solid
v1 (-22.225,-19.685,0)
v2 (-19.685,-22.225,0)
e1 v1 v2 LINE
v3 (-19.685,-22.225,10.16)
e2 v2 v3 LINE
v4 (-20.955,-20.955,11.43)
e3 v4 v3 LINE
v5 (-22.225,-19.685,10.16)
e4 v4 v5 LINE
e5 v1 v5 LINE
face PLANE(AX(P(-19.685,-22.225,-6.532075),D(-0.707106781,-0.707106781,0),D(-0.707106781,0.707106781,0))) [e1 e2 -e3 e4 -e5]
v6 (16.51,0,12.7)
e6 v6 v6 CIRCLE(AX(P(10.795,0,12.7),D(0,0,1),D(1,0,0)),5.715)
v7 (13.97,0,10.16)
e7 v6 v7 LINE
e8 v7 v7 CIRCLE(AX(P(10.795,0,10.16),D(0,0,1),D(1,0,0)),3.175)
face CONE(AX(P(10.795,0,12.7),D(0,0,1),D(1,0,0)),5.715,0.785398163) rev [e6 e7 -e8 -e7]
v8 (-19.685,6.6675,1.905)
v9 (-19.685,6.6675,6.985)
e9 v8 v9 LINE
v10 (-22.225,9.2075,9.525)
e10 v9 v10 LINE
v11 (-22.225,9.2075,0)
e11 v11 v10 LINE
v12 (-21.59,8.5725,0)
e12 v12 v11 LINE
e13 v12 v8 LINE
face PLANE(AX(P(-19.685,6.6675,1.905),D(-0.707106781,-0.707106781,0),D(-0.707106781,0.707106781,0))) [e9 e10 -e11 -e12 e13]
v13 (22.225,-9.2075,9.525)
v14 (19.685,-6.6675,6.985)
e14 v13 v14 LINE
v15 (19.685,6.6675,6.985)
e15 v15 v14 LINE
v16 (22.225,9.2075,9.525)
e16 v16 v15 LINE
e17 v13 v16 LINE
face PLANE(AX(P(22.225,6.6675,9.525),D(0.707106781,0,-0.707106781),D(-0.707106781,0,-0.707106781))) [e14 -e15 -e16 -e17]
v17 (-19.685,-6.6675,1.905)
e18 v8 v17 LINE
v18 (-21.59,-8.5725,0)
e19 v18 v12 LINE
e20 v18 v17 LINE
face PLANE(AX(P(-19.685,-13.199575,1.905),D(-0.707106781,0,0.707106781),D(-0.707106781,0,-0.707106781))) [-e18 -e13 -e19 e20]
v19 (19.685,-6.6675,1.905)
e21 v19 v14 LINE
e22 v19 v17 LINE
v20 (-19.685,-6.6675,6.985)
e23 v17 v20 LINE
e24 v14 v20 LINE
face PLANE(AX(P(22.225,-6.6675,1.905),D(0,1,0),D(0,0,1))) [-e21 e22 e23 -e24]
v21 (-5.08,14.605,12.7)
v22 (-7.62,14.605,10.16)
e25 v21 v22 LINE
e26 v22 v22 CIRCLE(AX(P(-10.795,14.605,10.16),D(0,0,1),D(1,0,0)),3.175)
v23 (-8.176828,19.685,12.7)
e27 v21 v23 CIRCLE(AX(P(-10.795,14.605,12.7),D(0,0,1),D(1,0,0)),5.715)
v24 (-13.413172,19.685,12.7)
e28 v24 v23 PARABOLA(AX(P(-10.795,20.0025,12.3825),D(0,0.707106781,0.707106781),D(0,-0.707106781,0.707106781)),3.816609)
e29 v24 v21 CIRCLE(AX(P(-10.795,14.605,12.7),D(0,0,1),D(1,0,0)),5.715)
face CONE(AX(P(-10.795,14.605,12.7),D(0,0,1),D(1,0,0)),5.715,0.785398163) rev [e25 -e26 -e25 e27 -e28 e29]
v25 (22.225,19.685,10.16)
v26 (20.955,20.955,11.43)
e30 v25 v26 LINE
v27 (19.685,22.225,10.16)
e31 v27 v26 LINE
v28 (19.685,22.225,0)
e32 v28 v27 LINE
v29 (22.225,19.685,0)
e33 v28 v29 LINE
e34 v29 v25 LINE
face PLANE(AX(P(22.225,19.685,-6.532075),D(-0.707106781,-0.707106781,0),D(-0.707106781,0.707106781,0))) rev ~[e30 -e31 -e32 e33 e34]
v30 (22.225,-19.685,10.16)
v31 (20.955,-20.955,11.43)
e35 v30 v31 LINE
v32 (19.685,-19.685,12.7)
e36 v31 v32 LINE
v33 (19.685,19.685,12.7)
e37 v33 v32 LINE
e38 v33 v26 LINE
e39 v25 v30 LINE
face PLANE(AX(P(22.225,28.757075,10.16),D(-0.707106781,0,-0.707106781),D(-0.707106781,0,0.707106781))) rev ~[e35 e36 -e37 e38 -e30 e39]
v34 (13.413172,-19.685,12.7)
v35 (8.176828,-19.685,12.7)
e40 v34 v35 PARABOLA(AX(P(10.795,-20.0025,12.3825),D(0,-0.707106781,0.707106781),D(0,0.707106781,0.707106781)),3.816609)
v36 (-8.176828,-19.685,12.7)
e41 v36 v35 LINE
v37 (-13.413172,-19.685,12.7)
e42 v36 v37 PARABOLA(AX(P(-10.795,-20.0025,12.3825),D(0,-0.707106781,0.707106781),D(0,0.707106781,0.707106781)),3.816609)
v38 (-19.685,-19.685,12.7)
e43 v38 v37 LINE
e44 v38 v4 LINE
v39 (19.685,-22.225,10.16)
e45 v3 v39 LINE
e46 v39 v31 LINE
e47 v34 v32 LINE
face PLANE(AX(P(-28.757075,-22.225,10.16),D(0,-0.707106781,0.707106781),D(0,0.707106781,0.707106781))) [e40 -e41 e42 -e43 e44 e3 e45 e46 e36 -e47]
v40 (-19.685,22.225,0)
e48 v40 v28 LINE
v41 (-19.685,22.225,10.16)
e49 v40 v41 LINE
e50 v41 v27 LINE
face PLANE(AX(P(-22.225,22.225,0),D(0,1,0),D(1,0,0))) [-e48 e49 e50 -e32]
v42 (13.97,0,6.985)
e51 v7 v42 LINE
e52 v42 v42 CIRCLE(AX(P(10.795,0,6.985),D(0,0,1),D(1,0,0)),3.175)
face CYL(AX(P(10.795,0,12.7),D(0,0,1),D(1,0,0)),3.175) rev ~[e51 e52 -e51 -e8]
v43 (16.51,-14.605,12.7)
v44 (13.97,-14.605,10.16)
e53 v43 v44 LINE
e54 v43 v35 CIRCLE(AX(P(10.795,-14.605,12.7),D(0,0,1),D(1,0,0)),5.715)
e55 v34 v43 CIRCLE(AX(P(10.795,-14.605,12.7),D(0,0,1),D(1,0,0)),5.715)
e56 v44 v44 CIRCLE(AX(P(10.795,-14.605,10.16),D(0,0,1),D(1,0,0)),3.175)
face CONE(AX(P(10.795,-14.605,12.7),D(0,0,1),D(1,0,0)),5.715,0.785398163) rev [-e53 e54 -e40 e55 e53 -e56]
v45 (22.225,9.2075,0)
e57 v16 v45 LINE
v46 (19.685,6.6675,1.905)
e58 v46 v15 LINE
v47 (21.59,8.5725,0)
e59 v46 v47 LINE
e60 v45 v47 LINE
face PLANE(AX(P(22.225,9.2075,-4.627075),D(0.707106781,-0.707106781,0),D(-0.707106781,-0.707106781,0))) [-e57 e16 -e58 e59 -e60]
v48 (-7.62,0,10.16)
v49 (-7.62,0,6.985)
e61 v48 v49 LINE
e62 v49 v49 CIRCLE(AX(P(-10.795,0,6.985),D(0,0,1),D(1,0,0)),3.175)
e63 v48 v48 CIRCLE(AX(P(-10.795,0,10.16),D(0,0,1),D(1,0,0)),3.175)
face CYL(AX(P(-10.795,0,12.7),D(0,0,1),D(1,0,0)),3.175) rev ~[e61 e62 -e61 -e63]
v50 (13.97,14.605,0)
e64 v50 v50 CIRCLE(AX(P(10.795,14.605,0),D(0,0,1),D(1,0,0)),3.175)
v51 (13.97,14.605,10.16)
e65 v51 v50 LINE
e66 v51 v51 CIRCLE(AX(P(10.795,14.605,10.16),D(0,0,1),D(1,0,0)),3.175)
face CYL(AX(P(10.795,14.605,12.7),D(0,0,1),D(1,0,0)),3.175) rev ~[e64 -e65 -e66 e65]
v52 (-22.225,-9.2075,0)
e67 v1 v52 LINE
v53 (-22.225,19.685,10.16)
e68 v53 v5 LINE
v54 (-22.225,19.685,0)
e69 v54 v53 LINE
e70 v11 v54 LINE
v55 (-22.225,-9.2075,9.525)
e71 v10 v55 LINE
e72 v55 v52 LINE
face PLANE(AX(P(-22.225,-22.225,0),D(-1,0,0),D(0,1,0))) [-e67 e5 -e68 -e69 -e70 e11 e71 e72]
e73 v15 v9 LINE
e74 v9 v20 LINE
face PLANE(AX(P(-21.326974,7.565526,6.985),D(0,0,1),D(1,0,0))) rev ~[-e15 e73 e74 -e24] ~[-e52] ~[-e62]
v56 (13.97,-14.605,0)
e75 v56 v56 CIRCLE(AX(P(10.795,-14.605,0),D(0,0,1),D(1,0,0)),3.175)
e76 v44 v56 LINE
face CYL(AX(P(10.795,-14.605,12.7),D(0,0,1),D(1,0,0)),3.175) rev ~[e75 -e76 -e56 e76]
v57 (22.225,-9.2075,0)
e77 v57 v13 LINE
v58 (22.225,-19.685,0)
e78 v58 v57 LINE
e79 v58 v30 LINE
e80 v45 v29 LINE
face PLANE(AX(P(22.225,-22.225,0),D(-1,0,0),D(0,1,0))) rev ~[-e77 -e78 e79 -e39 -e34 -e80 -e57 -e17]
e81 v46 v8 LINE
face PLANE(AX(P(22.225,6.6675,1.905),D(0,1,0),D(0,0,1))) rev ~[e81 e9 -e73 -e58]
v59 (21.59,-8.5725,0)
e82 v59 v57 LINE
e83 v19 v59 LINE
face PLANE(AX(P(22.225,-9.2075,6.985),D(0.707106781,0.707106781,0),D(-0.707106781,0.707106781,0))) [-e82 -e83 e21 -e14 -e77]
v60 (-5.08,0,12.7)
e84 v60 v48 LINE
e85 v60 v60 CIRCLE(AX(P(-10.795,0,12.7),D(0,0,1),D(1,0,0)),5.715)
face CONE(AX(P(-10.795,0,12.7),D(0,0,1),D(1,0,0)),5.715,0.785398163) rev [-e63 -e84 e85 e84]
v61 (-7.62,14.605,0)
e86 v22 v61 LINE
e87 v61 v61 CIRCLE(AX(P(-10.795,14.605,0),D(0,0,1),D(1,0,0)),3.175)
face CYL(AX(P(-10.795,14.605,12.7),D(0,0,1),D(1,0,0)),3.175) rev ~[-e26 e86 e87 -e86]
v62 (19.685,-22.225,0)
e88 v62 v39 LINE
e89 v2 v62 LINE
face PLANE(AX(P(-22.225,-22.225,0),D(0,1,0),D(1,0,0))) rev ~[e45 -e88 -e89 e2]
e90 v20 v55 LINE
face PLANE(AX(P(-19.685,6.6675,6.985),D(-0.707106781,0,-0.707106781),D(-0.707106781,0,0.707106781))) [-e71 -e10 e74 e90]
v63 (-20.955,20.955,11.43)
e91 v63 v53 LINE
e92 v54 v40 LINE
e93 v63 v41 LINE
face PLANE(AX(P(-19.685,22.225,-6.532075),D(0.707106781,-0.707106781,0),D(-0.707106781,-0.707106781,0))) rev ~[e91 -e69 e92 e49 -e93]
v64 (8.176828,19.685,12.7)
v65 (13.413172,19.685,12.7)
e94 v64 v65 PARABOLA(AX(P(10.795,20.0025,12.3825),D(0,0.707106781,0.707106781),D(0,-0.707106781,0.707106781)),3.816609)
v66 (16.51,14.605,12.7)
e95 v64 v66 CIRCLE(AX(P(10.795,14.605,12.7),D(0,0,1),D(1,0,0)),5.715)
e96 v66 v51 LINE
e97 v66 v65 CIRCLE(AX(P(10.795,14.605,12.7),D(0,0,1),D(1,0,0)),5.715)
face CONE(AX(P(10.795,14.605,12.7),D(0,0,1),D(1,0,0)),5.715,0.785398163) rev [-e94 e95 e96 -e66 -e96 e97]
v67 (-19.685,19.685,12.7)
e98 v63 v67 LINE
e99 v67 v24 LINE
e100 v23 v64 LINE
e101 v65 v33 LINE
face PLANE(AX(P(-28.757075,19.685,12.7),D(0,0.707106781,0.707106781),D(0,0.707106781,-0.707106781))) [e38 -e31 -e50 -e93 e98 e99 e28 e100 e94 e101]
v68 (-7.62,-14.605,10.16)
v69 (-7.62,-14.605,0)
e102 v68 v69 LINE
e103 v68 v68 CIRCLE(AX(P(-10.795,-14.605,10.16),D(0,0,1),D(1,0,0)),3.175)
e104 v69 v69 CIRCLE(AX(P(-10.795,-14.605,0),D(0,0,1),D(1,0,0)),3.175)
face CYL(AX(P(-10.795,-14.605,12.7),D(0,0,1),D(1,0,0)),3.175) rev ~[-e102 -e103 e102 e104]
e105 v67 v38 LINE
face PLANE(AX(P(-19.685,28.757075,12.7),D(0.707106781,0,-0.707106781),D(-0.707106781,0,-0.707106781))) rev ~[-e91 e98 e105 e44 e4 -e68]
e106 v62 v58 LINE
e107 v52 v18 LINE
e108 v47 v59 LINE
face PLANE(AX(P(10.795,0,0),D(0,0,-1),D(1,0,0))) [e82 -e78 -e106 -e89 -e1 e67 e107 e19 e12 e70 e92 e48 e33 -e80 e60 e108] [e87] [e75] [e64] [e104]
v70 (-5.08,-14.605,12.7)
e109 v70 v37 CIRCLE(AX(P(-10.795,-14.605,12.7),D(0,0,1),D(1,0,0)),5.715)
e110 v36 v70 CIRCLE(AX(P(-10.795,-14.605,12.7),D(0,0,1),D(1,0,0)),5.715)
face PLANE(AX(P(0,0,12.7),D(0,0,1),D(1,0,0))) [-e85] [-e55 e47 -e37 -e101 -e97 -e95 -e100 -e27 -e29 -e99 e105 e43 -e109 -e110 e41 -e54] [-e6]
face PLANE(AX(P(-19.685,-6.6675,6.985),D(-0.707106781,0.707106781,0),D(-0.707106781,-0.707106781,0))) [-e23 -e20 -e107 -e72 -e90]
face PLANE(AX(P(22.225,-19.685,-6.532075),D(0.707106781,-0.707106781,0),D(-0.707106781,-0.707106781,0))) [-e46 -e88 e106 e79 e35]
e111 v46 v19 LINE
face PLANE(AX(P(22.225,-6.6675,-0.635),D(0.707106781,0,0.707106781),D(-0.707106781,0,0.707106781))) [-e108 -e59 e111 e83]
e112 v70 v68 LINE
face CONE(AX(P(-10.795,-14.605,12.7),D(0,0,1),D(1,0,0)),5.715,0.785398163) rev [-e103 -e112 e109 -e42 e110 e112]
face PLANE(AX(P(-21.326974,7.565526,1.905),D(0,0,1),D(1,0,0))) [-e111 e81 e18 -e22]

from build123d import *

# Parameters (mm, degrees)
F0_W          = 44.45
F0_H          = 44.45
F1_DEPTH      = 12.7
F2_W          = 13.335
F2_H          = 5.08
F3_DEPTH      = 76.2
F4_R          = 3.175
F5_DEPTH      = 25.4
F6_T1_DEPTH   = 57.5141495789
F6_T3_DEPTH   = 57.5141495789
F7_T1_DEPTH   = 5.08
F7_T3_DEPTH   = 13.335
F7_T5_DEPTH   = 23.2241495789
F7_T11_DEPTH  = 19.8670747894
F7_T16_DEPTH  = 11.6120747894
F7_T24_DEPTH  = 19.8670747894
F7_T28_DEPTH  = 11.6120747894
F7_T36_DEPTH  = 11.6120747894
F7_T41_DEPTH  = 19.8670747894
F7_T49_DEPTH  = 11.6120747894
F7_T54_DEPTH  = 19.8670747894
F7_T61_DEPTH  = 19.8670747894
F7_T65_DEPTH  = 11.6120747894
F7_T73_DEPTH  = 11.6120747894
F7_T78_DEPTH  = 19.8670747894
F7_T85_DEPTH  = 19.8670747894
F7_T90_DEPTH  = 11.6120747894
F7_T98_DEPTH  = 11.6120747894
F7_T103_DEPTH = 19.8670747894
F8_R          = 3.175
F9_DEPTH      = 1.905


# Not quite as in the source:
# - a fillet or chamfer that OpenCascade refuses, or shapes differently, is made with other operations: its cross-section is extruded or revolved along the edge and cut away or added


with BuildPart() as f1:
    # F0 (on Top) → F1 (new body)
    with BuildSketch(Plane.XY):
        Rectangle(F0_W, F0_H)
    extrude(amount=F1_DEPTH)

    # F2 (on face) → F3 (cut)
    with BuildSketch(Plane.YZ.offset(22.225)):
        with Locations((0, 4.445)):
            Rectangle(F2_W, F2_H)
    extrude(amount=-F3_DEPTH, mode=Mode.SUBTRACT)

    # F4 (on face) → F5 (cut)
    with BuildSketch(Plane.XY.offset(12.7)):
        with Locations((10.795, 14.605)):
            Circle(F4_R)
        with Locations((-10.795, 14.605)):
            Circle(F4_R)
        with Locations((-10.795, -14.605)):
            Circle(F4_R)
        with Locations((10.795, -14.605)):
            Circle(F4_R)
        with Locations((-10.795, 0)):
            Circle(F4_R)
        with Locations((10.795, 0)):
            Circle(F4_R)
    extrude(amount=-F5_DEPTH, mode=Mode.SUBTRACT)

    # F6: chamfer of 2.54 on 10 edges, made by hand

    # F6_s2 → F6_t1 (cut)
    with BuildSketch(Plane.XZ.offset(-28.7570747894)):
        Polygon((22.225, 10.16), (19.685, 12.7), (22.225, 12.7), align=None)
        Polygon((-19.685, 12.7), (-22.225, 10.16), (-22.225, 12.7), align=None)
    extrude(amount=F6_T1_DEPTH, mode=Mode.SUBTRACT)

    # F6_s4 → F6_t3 (cut)
    with BuildSketch(Plane.YZ.offset(-28.7570747894)):
        Polygon((-22.225, 10.16), (-19.685, 12.7), (-22.225, 12.7), align=None)
        Polygon((19.685, 12.7), (22.225, 10.16), (22.225, 12.7), align=None)
    extrude(amount=F6_T3_DEPTH, mode=Mode.SUBTRACT)

    # F6_s5 → F6_t6 (revolve, cut)
    with BuildSketch(Plane.XZ.offset(14.605)):
        Polygon((-5.08, 12.7), (-7.62, 10.16), (-7.62, 12.7), align=None)
    revolve(axis=Axis((-10.795, -14.605, 12.7), (0, 0, 1)), mode=Mode.SUBTRACT)

    # F6_s7 → F6_t8 (revolve, cut)
    with BuildSketch(Plane.XZ):
        Polygon((-5.08, 12.7), (-7.62, 10.16), (-7.62, 12.7), align=None)
    revolve(axis=Axis((-10.795, 0, 12.7), (0, 0, 1)), mode=Mode.SUBTRACT)

    # F6_s9 → F6_t10 (revolve, cut)
    with BuildSketch(Plane.XZ.offset(14.605)):
        Polygon((16.51, 12.7), (13.97, 10.16), (13.97, 12.7), align=None)
    revolve(axis=Axis((10.795, -14.605, 12.7), (0, 0, 1)), mode=Mode.SUBTRACT)

    # F6_s11 → F6_t12 (revolve, cut)
    with BuildSketch(Plane.XZ):
        Polygon((16.51, 12.7), (13.97, 10.16), (13.97, 12.7), align=None)
    revolve(axis=Axis((10.795, 0, 12.7), (0, 0, 1)), mode=Mode.SUBTRACT)

    # F6_s13 → F6_t14 (revolve, cut)
    with BuildSketch(Plane.XZ.offset(-14.605)):
        Polygon((-5.08, 12.7), (-7.62, 10.16), (-7.62, 12.7), align=None)
    revolve(axis=Axis((-10.795, 14.605, 12.7), (0, 0, 1)), mode=Mode.SUBTRACT)

    # F6_s15 → F6_t16 (revolve, cut)
    with BuildSketch(Plane.XZ.offset(-14.605)):
        Polygon((16.51, 12.7), (13.97, 10.16), (13.97, 12.7), align=None)
    revolve(axis=Axis((10.795, 14.605, 12.7), (0, 0, 1)), mode=Mode.SUBTRACT)

    # F7: chamfer of 2.54 on 12 edges, made by hand

    # F7_s2 → F7_t1 (cut)
    with BuildSketch(Plane.XY.offset(1.905)):
        Polygon((22.225, 9.2075), (19.685, 6.6675), (22.225, 6.6675), align=None)
        Polygon((22.225, -9.2075), (19.685, -6.6675), (22.225, -6.6675), align=None)
        Polygon((-19.685, 6.6675), (-22.225, 9.2075), (-22.225, 6.6675), align=None)
        Polygon((-19.685, -6.6675), (-22.225, -9.2075), (-22.225, -6.6675), align=None)
    extrude(amount=F7_T1_DEPTH, mode=Mode.SUBTRACT)

    # F7_s4 → F7_t3 (cut)
    with BuildSketch(Plane.XZ.offset(-6.6675)):
        Polygon((22.225, -0.635), (19.685, 1.905), (22.225, 1.905), align=None)
        Polygon((22.225, 9.525), (19.685, 6.985), (22.225, 6.985), align=None)
        Polygon((-19.685, 6.985), (-22.225, 9.525), (-22.225, 6.985), align=None)
        Polygon((-19.685, 1.905), (-22.225, -0.635), (-22.225, 1.905), align=None)
    extrude(amount=F7_T3_DEPTH, mode=Mode.SUBTRACT)

    # F7_s6 → F7_t5 (cut)
    with BuildSketch(Plane.XY.offset(-6.5320747894)):
        Polygon((-19.685, -22.225), (-22.225, -19.685), (-22.225, -22.225), align=None)
        Polygon((22.225, -19.685), (19.685, -22.225), (22.225, -22.225), align=None)
        Polygon((22.225, 19.685), (19.685, 22.225), (22.225, 22.225), align=None)
        Polygon((-19.685, 22.225), (-22.225, 19.685), (-22.225, 22.225), align=None)
    extrude(amount=F7_T5_DEPTH, mode=Mode.SUBTRACT)


with BuildPart() as f7_tool9:
    # F7_s10 → F7_t11 (new body)
    with BuildSketch(Plane.XZ.offset(6.6675)):
        Polygon((22.225, -0.635), (19.685, 1.905), (22.225, 1.905), align=None)
    extrude(amount=-F7_T11_DEPTH)

    split(bisect_by=Plane.XY, keep=Keep.TOP)

    split(bisect_by=Plane.XZ.offset(-6.6675), keep=Keep.BOTTOM)


with BuildPart() as f7_tool14:
    # F7_s15 → F7_t16 (new body)
    with BuildSketch(Plane.XY.offset(-4.6270747894)):
        Polygon((22.225, 9.2075), (19.685, 6.6675), (22.225, 6.6675), align=None)
    extrude(amount=F7_T16_DEPTH)

    split(bisect_by=Plane.XY, keep=Keep.TOP)

    split(bisect_by=Plane.XY.offset(1.905), keep=Keep.BOTTOM)


with BuildPart() as f7_tool9_1:
    add(f7_tool9.part)

    # F7_t19: intersect F7_tool14
    add(f7_tool14.part, mode=Mode.INTERSECT)


with BuildPart() as f1_1:
    add(f1.part)

    # F7_t7: cut F7_tool9
    add(f7_tool9_1.part, mode=Mode.SUBTRACT)


with BuildPart() as f7_tool22:
    # F7_s23 → F7_t24 (new body)
    with BuildSketch(Plane.XZ.offset(-13.1995747894)):
        Polygon((22.225, 9.525), (19.685, 6.985), (22.225, 6.985), align=None)
    extrude(amount=F7_T24_DEPTH)

    split(bisect_by=Plane.XZ.offset(-6.6675), keep=Keep.BOTTOM)


with BuildPart() as f7_tool26:
    # F7_s27 → F7_t28 (new body)
    with BuildSketch(Plane.XY.offset(1.905)):
        Polygon((22.225, 9.2075), (19.685, 6.6675), (22.225, 6.6675), align=None)
    extrude(amount=F7_T28_DEPTH)

    split(bisect_by=Plane(origin=(16.1925, 0, 16.1925), x_dir=(0, 1, 0), z_dir=(-0.7071067812, 0, -0.7071067812)), keep=Keep.TOP)

    split(bisect_by=Plane.XY.offset(6.985), keep=Keep.TOP)


with BuildPart() as f7_tool22_1:
    add(f7_tool22.part)

    # F7_t31: intersect F7_tool26
    add(f7_tool26.part, mode=Mode.INTERSECT)


with BuildPart() as f1_2:
    add(f1_1.part)

    # F7_t20: cut F7_tool22
    add(f7_tool22_1.part, mode=Mode.SUBTRACT)


with BuildPart() as f7_tool34:
    # F7_s35 → F7_t36 (new body)
    with BuildSketch(Plane.XY.offset(6.985)):
        Polygon((22.225, -9.2075), (19.685, -6.6675), (22.225, -6.6675), align=None)
    extrude(amount=-F7_T36_DEPTH)

    split(bisect_by=Plane.XY, keep=Keep.TOP)

    split(bisect_by=Plane.XY.offset(1.905), keep=Keep.BOTTOM)


with BuildPart() as f7_tool39:
    # F7_s40 → F7_t41 (new body)
    with BuildSketch(Plane.XZ.offset(13.1995747894)):
        Polygon((22.225, -0.635), (19.685, 1.905), (22.225, 1.905), align=None)
    extrude(amount=-F7_T41_DEPTH)

    split(bisect_by=Plane.XY, keep=Keep.TOP)

    split(bisect_by=Plane.XZ.offset(6.6675), keep=Keep.TOP)


with BuildPart() as f7_tool34_1:
    add(f7_tool34.part)

    # F7_t44: intersect F7_tool39
    add(f7_tool39.part, mode=Mode.INTERSECT)


with BuildPart() as f1_3:
    add(f1_2.part)

    # F7_t32: cut F7_tool34
    add(f7_tool34_1.part, mode=Mode.SUBTRACT)


with BuildPart() as f7_tool47:
    # F7_s48 → F7_t49 (new body)
    with BuildSketch(Plane.XY.offset(13.5170747894)):
        Polygon((22.225, -9.2075), (19.685, -6.6675), (22.225, -6.6675), align=None)
    extrude(amount=-F7_T49_DEPTH)

    split(bisect_by=Plane(origin=(16.1925, 0, 16.1925), x_dir=(0, 1, 0), z_dir=(-0.7071067812, 0, -0.7071067812)), keep=Keep.TOP)

    split(bisect_by=Plane.XY.offset(6.985), keep=Keep.TOP)


with BuildPart() as f7_tool52:
    # F7_s53 → F7_t54 (new body)
    with BuildSketch(Plane.XZ.offset(-6.6675)):
        Polygon((22.225, 9.525), (19.685, 6.985), (22.225, 6.985), align=None)
    extrude(amount=F7_T54_DEPTH)

    split(bisect_by=Plane.XZ.offset(6.6675), keep=Keep.TOP)


with BuildPart() as f7_tool47_1:
    add(f7_tool47.part)

    # F7_t56: intersect F7_tool52
    add(f7_tool52.part, mode=Mode.INTERSECT)


with BuildPart() as f1_4:
    add(f1_3.part)

    # F7_t45: cut F7_tool47
    add(f7_tool47_1.part, mode=Mode.SUBTRACT)


with BuildPart() as f7_tool59:
    # F7_s60 → F7_t61 (new body)
    with BuildSketch(Plane.XZ.offset(-13.1995747894)):
        Polygon((-19.685, 6.985), (-22.225, 9.525), (-22.225, 6.985), align=None)
    extrude(amount=F7_T61_DEPTH)

    split(bisect_by=Plane.XZ.offset(-6.6675), keep=Keep.BOTTOM)


with BuildPart() as f7_tool63:
    # F7_s64 → F7_t65 (new body)
    with BuildSketch(Plane.XY.offset(1.905)):
        Polygon((-19.685, 6.6675), (-22.225, 9.2075), (-22.225, 6.6675), align=None)
    extrude(amount=F7_T65_DEPTH)

    split(bisect_by=Plane.XY.offset(6.985), keep=Keep.TOP)

    split(bisect_by=Plane(origin=(-16.1925, 0, 16.1925), x_dir=(0, 1, 0), z_dir=(0.7071067812, 0, -0.7071067812)), keep=Keep.TOP)


with BuildPart() as f7_tool59_1:
    add(f7_tool59.part)

    # F7_t68: intersect F7_tool63
    add(f7_tool63.part, mode=Mode.INTERSECT)


with BuildPart() as f1_5:
    add(f1_4.part)

    # F7_t57: cut F7_tool59
    add(f7_tool59_1.part, mode=Mode.SUBTRACT)


with BuildPart() as f7_tool71:
    # F7_s72 → F7_t73 (new body)
    with BuildSketch(Plane.XY.offset(13.5170747894)):
        Polygon((-19.685, -6.6675), (-22.225, -9.2075), (-22.225, -6.6675), align=None)
    extrude(amount=-F7_T73_DEPTH)

    split(bisect_by=Plane.XY.offset(6.985), keep=Keep.TOP)

    split(bisect_by=Plane(origin=(-16.1925, 0, 16.1925), x_dir=(0, 1, 0), z_dir=(0.7071067812, 0, -0.7071067812)), keep=Keep.TOP)


with BuildPart() as f7_tool76:
    # F7_s77 → F7_t78 (new body)
    with BuildSketch(Plane.XZ.offset(-6.6675)):
        Polygon((-19.685, 6.985), (-22.225, 9.525), (-22.225, 6.985), align=None)
    extrude(amount=F7_T78_DEPTH)

    split(bisect_by=Plane.XZ.offset(6.6675), keep=Keep.TOP)


with BuildPart() as f7_tool71_1:
    add(f7_tool71.part)

    # F7_t80: intersect F7_tool76
    add(f7_tool76.part, mode=Mode.INTERSECT)


with BuildPart() as f1_6:
    add(f1_5.part)

    # F7_t69: cut F7_tool71
    add(f7_tool71_1.part, mode=Mode.SUBTRACT)


with BuildPart() as f7_tool83:
    # F7_s84 → F7_t85 (new body)
    with BuildSketch(Plane.XZ.offset(6.6675)):
        Polygon((-19.685, 1.905), (-22.225, -0.635), (-22.225, 1.905), align=None)
    extrude(amount=-F7_T85_DEPTH)

    split(bisect_by=Plane.XY, keep=Keep.TOP)

    split(bisect_by=Plane.XZ.offset(-6.6675), keep=Keep.BOTTOM)


with BuildPart() as f7_tool88:
    # F7_s89 → F7_t90 (new body)
    with BuildSketch(Plane.XY.offset(-4.6270747894)):
        Polygon((-19.685, 6.6675), (-22.225, 9.2075), (-22.225, 6.6675), align=None)
    extrude(amount=F7_T90_DEPTH)

    split(bisect_by=Plane.XY, keep=Keep.TOP)

    split(bisect_by=Plane.XY.offset(1.905), keep=Keep.BOTTOM)


with BuildPart() as f7_tool83_1:
    add(f7_tool83.part)

    # F7_t93: intersect F7_tool88
    add(f7_tool88.part, mode=Mode.INTERSECT)


with BuildPart() as f1_7:
    add(f1_6.part)

    # F7_t81: cut F7_tool83
    add(f7_tool83_1.part, mode=Mode.SUBTRACT)


with BuildPart() as f7_tool96:
    # F7_s97 → F7_t98 (new body)
    with BuildSketch(Plane.XY.offset(6.985)):
        Polygon((-19.685, -6.6675), (-22.225, -9.2075), (-22.225, -6.6675), align=None)
    extrude(amount=-F7_T98_DEPTH)

    split(bisect_by=Plane.XY, keep=Keep.TOP)

    split(bisect_by=Plane.XY.offset(1.905), keep=Keep.BOTTOM)


with BuildPart() as f7_tool101:
    # F7_s102 → F7_t103 (new body)
    with BuildSketch(Plane.XZ.offset(13.1995747894)):
        Polygon((-19.685, 1.905), (-22.225, -0.635), (-22.225, 1.905), align=None)
    extrude(amount=-F7_T103_DEPTH)

    split(bisect_by=Plane.XY, keep=Keep.TOP)

    split(bisect_by=Plane.XZ.offset(6.6675), keep=Keep.TOP)


with BuildPart() as f7_tool96_1:
    add(f7_tool96.part)

    # F7_t106: intersect F7_tool101
    add(f7_tool101.part, mode=Mode.INTERSECT)


with BuildPart() as f1_8:
    add(f1_7.part)

    # F7_t94: cut F7_tool96
    add(f7_tool96_1.part, mode=Mode.SUBTRACT)

    # F8 (on face) → F9 (join, through all)
    with BuildSketch(Plane(origin=(0, 0, 0), x_dir=(1, 0, 0), z_dir=(0, 0, -1))):
        with Locations((10.795, 0)):
            Circle(F8_R)
        with Locations((-10.795, 0)):
            Circle(F8_R)
    extrude(amount=-F9_DEPTH)


solid = f1_8.part
